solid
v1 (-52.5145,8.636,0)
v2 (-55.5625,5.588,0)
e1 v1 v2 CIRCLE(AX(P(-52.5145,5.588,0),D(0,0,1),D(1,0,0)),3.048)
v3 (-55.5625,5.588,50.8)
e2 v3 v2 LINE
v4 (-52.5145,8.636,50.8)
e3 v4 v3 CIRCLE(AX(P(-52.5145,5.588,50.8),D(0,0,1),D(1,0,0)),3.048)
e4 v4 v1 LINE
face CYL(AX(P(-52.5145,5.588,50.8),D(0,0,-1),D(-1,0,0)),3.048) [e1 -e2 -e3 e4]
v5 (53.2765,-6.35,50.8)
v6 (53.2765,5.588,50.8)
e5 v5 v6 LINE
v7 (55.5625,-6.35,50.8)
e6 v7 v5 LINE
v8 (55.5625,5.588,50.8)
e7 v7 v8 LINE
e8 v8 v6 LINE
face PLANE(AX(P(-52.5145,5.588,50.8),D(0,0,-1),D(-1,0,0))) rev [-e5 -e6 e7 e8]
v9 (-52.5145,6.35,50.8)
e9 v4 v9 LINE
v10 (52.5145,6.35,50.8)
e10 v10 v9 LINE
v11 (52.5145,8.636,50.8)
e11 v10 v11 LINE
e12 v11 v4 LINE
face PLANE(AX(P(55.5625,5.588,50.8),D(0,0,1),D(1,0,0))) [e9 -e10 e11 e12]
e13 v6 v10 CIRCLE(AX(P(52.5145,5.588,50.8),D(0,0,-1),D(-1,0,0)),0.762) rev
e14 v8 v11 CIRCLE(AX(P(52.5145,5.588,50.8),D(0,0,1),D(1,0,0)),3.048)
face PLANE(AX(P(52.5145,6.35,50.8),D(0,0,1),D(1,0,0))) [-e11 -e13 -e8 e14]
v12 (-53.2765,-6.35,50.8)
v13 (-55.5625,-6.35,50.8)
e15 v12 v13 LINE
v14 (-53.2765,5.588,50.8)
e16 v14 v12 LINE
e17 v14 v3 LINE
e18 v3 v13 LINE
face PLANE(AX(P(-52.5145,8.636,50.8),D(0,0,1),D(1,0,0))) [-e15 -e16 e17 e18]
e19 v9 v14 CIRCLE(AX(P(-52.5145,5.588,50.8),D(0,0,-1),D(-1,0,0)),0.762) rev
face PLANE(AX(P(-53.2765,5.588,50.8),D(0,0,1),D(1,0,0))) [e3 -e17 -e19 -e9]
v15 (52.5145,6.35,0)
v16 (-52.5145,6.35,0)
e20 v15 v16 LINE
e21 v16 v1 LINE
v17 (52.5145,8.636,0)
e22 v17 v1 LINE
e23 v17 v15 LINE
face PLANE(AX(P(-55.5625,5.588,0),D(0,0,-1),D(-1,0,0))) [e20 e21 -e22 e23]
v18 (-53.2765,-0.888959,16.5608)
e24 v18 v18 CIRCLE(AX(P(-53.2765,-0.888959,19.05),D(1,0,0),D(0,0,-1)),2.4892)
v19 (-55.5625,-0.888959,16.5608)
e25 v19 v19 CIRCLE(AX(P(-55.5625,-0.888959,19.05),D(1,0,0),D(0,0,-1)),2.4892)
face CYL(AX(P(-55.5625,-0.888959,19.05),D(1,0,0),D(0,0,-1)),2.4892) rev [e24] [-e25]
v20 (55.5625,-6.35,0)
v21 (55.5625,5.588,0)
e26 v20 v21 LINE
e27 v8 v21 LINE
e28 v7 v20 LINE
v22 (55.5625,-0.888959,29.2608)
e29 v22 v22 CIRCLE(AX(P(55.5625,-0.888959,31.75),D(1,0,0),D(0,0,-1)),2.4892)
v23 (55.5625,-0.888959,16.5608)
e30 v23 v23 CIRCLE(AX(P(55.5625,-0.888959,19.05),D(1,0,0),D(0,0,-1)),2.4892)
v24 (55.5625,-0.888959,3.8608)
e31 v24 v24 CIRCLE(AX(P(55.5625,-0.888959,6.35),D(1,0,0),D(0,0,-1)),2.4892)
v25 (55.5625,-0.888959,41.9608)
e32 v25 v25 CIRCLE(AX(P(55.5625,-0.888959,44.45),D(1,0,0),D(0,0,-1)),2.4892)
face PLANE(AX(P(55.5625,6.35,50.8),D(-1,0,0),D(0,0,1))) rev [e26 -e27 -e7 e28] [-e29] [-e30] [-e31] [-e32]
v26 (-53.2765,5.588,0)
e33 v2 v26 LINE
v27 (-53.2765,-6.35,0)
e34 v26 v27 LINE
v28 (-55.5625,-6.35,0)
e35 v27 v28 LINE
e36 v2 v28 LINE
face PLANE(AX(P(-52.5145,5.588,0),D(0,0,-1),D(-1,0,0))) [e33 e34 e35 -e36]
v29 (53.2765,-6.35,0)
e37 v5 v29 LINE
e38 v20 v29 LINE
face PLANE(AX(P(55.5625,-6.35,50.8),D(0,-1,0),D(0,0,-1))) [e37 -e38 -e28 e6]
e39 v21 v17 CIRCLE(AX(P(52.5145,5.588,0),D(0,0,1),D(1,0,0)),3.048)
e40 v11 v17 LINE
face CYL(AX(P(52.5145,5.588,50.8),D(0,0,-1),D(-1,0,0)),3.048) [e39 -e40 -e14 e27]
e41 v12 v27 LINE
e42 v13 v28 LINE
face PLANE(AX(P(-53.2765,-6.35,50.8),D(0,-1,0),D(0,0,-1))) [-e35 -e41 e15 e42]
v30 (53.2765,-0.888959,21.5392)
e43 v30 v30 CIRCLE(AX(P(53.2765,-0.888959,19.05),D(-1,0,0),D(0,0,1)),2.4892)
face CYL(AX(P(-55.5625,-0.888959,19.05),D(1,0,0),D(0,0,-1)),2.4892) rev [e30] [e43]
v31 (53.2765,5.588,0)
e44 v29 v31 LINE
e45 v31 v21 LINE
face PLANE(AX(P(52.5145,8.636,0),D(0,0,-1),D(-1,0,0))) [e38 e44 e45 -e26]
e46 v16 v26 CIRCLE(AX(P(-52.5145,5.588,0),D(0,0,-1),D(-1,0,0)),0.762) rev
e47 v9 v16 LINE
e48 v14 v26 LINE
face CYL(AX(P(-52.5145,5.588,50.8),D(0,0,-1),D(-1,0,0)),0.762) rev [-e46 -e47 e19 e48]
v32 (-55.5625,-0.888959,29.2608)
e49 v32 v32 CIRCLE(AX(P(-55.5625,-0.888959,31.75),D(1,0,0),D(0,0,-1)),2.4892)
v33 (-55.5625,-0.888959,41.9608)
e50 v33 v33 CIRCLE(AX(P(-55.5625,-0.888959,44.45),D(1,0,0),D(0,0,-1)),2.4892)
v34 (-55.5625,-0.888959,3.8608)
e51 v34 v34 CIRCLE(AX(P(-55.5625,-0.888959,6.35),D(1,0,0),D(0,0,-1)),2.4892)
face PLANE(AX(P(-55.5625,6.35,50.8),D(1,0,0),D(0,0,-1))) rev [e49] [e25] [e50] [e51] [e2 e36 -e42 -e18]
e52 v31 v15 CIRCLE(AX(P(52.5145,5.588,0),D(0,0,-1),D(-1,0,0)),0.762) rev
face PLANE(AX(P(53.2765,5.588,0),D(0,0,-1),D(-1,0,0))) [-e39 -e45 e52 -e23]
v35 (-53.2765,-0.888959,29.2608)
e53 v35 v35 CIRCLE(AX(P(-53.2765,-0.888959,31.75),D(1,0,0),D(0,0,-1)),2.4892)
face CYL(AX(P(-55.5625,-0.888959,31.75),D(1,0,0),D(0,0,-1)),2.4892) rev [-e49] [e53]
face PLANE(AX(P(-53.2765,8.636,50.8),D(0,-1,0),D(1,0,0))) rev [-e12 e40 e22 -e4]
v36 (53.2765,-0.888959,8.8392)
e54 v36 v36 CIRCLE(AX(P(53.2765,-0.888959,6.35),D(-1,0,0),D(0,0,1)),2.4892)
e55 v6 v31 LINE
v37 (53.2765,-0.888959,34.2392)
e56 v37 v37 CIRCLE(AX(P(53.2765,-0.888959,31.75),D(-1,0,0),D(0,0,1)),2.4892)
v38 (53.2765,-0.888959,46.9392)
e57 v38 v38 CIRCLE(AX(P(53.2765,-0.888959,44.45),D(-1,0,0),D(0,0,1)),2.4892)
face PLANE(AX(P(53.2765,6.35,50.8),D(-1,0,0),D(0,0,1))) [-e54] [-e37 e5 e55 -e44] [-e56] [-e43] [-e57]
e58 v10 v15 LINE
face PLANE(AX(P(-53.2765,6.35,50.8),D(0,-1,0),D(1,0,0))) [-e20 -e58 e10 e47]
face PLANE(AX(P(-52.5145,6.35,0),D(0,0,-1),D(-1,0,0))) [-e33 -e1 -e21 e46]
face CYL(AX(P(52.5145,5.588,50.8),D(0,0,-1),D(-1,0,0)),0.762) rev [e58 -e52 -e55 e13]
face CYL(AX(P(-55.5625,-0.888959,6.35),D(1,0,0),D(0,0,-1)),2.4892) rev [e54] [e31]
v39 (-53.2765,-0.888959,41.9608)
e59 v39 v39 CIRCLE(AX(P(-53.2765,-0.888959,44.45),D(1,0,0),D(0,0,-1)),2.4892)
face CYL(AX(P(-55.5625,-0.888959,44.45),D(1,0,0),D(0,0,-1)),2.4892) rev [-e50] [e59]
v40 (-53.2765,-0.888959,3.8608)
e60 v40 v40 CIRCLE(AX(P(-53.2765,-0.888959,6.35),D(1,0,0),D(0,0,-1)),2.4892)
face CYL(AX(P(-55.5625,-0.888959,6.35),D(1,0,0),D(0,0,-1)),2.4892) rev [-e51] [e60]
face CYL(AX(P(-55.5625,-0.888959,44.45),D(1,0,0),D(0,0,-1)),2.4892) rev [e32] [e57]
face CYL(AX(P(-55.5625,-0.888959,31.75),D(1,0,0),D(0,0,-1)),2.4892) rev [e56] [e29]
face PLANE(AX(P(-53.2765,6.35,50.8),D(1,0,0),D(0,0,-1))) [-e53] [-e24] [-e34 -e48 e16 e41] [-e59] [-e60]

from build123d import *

# Parameters (mm, degrees)
BASE_FLANGE1_DEPTH      = 50.8
CUT_EXTRUDE1_DEPTH      = 76.778703488
CUT_EXTRUDE1_DEPTH_BACK = 76.778703488
SKETCH6_R               = 2.4892


# Sheet-metal steps are written as plain solids
with BuildPart() as part:
    # Sketch1 → Base-Flange1 (new body)
    with BuildSketch(Plane.XY):
        with BuildLine():
            Line((-53.2765, -6.35), (-53.2765, 5.588))
            ThreePointArc((-53.2765, 5.588), (-53.053315367, 6.126815367), (-52.5145, 6.35))
            Line((-52.5145, 6.35), (52.5145, 6.35))
            ThreePointArc((52.5145, 6.35), (53.053315367, 6.126815367), (53.2765, 5.588))
            Line((53.2765, 5.588), (53.2765, -6.35))
            Line((53.2765, -6.35), (55.5625, -6.35))
            Line((55.5625, -6.35), (55.5625, 5.588))
            ThreePointArc((55.5625, 5.588), (54.669761469, 7.743261469), (52.5145, 8.636))
            Line((52.5145, 8.636), (-52.5145, 8.636))
            ThreePointArc((-52.5145, 8.636), (-54.669761469, 7.743261469), (-55.5625, 5.588))
            Line((-55.5625, 5.588), (-55.5625, -6.35))
            Line((-55.5625, -6.35), (-53.2765, -6.35))
        make_face()
    extrude(amount=BASE_FLANGE1_DEPTH)

    # Sketch6 → Cut-Extrude1 (cut, two sides: drawn at the far end of the back side and taken through both)
    with BuildSketch(Plane(origin=(0, 0, 0), x_dir=(0, 0, -1), z_dir=(1, 0, 0)).offset(-CUT_EXTRUDE1_DEPTH_BACK)):
        with Locations((-6.35, -0.888959106)):
            Circle(SKETCH6_R)
        with Locations((-19.05, -0.888959106)):
            Circle(SKETCH6_R)
        with Locations((-31.75, -0.888959106)):
            Circle(SKETCH6_R)
        with Locations((-44.45, -0.888959106)):
            Circle(SKETCH6_R)
    extrude(amount=CUT_EXTRUDE1_DEPTH + CUT_EXTRUDE1_DEPTH_BACK, mode=Mode.SUBTRACT)


solid = part.part
